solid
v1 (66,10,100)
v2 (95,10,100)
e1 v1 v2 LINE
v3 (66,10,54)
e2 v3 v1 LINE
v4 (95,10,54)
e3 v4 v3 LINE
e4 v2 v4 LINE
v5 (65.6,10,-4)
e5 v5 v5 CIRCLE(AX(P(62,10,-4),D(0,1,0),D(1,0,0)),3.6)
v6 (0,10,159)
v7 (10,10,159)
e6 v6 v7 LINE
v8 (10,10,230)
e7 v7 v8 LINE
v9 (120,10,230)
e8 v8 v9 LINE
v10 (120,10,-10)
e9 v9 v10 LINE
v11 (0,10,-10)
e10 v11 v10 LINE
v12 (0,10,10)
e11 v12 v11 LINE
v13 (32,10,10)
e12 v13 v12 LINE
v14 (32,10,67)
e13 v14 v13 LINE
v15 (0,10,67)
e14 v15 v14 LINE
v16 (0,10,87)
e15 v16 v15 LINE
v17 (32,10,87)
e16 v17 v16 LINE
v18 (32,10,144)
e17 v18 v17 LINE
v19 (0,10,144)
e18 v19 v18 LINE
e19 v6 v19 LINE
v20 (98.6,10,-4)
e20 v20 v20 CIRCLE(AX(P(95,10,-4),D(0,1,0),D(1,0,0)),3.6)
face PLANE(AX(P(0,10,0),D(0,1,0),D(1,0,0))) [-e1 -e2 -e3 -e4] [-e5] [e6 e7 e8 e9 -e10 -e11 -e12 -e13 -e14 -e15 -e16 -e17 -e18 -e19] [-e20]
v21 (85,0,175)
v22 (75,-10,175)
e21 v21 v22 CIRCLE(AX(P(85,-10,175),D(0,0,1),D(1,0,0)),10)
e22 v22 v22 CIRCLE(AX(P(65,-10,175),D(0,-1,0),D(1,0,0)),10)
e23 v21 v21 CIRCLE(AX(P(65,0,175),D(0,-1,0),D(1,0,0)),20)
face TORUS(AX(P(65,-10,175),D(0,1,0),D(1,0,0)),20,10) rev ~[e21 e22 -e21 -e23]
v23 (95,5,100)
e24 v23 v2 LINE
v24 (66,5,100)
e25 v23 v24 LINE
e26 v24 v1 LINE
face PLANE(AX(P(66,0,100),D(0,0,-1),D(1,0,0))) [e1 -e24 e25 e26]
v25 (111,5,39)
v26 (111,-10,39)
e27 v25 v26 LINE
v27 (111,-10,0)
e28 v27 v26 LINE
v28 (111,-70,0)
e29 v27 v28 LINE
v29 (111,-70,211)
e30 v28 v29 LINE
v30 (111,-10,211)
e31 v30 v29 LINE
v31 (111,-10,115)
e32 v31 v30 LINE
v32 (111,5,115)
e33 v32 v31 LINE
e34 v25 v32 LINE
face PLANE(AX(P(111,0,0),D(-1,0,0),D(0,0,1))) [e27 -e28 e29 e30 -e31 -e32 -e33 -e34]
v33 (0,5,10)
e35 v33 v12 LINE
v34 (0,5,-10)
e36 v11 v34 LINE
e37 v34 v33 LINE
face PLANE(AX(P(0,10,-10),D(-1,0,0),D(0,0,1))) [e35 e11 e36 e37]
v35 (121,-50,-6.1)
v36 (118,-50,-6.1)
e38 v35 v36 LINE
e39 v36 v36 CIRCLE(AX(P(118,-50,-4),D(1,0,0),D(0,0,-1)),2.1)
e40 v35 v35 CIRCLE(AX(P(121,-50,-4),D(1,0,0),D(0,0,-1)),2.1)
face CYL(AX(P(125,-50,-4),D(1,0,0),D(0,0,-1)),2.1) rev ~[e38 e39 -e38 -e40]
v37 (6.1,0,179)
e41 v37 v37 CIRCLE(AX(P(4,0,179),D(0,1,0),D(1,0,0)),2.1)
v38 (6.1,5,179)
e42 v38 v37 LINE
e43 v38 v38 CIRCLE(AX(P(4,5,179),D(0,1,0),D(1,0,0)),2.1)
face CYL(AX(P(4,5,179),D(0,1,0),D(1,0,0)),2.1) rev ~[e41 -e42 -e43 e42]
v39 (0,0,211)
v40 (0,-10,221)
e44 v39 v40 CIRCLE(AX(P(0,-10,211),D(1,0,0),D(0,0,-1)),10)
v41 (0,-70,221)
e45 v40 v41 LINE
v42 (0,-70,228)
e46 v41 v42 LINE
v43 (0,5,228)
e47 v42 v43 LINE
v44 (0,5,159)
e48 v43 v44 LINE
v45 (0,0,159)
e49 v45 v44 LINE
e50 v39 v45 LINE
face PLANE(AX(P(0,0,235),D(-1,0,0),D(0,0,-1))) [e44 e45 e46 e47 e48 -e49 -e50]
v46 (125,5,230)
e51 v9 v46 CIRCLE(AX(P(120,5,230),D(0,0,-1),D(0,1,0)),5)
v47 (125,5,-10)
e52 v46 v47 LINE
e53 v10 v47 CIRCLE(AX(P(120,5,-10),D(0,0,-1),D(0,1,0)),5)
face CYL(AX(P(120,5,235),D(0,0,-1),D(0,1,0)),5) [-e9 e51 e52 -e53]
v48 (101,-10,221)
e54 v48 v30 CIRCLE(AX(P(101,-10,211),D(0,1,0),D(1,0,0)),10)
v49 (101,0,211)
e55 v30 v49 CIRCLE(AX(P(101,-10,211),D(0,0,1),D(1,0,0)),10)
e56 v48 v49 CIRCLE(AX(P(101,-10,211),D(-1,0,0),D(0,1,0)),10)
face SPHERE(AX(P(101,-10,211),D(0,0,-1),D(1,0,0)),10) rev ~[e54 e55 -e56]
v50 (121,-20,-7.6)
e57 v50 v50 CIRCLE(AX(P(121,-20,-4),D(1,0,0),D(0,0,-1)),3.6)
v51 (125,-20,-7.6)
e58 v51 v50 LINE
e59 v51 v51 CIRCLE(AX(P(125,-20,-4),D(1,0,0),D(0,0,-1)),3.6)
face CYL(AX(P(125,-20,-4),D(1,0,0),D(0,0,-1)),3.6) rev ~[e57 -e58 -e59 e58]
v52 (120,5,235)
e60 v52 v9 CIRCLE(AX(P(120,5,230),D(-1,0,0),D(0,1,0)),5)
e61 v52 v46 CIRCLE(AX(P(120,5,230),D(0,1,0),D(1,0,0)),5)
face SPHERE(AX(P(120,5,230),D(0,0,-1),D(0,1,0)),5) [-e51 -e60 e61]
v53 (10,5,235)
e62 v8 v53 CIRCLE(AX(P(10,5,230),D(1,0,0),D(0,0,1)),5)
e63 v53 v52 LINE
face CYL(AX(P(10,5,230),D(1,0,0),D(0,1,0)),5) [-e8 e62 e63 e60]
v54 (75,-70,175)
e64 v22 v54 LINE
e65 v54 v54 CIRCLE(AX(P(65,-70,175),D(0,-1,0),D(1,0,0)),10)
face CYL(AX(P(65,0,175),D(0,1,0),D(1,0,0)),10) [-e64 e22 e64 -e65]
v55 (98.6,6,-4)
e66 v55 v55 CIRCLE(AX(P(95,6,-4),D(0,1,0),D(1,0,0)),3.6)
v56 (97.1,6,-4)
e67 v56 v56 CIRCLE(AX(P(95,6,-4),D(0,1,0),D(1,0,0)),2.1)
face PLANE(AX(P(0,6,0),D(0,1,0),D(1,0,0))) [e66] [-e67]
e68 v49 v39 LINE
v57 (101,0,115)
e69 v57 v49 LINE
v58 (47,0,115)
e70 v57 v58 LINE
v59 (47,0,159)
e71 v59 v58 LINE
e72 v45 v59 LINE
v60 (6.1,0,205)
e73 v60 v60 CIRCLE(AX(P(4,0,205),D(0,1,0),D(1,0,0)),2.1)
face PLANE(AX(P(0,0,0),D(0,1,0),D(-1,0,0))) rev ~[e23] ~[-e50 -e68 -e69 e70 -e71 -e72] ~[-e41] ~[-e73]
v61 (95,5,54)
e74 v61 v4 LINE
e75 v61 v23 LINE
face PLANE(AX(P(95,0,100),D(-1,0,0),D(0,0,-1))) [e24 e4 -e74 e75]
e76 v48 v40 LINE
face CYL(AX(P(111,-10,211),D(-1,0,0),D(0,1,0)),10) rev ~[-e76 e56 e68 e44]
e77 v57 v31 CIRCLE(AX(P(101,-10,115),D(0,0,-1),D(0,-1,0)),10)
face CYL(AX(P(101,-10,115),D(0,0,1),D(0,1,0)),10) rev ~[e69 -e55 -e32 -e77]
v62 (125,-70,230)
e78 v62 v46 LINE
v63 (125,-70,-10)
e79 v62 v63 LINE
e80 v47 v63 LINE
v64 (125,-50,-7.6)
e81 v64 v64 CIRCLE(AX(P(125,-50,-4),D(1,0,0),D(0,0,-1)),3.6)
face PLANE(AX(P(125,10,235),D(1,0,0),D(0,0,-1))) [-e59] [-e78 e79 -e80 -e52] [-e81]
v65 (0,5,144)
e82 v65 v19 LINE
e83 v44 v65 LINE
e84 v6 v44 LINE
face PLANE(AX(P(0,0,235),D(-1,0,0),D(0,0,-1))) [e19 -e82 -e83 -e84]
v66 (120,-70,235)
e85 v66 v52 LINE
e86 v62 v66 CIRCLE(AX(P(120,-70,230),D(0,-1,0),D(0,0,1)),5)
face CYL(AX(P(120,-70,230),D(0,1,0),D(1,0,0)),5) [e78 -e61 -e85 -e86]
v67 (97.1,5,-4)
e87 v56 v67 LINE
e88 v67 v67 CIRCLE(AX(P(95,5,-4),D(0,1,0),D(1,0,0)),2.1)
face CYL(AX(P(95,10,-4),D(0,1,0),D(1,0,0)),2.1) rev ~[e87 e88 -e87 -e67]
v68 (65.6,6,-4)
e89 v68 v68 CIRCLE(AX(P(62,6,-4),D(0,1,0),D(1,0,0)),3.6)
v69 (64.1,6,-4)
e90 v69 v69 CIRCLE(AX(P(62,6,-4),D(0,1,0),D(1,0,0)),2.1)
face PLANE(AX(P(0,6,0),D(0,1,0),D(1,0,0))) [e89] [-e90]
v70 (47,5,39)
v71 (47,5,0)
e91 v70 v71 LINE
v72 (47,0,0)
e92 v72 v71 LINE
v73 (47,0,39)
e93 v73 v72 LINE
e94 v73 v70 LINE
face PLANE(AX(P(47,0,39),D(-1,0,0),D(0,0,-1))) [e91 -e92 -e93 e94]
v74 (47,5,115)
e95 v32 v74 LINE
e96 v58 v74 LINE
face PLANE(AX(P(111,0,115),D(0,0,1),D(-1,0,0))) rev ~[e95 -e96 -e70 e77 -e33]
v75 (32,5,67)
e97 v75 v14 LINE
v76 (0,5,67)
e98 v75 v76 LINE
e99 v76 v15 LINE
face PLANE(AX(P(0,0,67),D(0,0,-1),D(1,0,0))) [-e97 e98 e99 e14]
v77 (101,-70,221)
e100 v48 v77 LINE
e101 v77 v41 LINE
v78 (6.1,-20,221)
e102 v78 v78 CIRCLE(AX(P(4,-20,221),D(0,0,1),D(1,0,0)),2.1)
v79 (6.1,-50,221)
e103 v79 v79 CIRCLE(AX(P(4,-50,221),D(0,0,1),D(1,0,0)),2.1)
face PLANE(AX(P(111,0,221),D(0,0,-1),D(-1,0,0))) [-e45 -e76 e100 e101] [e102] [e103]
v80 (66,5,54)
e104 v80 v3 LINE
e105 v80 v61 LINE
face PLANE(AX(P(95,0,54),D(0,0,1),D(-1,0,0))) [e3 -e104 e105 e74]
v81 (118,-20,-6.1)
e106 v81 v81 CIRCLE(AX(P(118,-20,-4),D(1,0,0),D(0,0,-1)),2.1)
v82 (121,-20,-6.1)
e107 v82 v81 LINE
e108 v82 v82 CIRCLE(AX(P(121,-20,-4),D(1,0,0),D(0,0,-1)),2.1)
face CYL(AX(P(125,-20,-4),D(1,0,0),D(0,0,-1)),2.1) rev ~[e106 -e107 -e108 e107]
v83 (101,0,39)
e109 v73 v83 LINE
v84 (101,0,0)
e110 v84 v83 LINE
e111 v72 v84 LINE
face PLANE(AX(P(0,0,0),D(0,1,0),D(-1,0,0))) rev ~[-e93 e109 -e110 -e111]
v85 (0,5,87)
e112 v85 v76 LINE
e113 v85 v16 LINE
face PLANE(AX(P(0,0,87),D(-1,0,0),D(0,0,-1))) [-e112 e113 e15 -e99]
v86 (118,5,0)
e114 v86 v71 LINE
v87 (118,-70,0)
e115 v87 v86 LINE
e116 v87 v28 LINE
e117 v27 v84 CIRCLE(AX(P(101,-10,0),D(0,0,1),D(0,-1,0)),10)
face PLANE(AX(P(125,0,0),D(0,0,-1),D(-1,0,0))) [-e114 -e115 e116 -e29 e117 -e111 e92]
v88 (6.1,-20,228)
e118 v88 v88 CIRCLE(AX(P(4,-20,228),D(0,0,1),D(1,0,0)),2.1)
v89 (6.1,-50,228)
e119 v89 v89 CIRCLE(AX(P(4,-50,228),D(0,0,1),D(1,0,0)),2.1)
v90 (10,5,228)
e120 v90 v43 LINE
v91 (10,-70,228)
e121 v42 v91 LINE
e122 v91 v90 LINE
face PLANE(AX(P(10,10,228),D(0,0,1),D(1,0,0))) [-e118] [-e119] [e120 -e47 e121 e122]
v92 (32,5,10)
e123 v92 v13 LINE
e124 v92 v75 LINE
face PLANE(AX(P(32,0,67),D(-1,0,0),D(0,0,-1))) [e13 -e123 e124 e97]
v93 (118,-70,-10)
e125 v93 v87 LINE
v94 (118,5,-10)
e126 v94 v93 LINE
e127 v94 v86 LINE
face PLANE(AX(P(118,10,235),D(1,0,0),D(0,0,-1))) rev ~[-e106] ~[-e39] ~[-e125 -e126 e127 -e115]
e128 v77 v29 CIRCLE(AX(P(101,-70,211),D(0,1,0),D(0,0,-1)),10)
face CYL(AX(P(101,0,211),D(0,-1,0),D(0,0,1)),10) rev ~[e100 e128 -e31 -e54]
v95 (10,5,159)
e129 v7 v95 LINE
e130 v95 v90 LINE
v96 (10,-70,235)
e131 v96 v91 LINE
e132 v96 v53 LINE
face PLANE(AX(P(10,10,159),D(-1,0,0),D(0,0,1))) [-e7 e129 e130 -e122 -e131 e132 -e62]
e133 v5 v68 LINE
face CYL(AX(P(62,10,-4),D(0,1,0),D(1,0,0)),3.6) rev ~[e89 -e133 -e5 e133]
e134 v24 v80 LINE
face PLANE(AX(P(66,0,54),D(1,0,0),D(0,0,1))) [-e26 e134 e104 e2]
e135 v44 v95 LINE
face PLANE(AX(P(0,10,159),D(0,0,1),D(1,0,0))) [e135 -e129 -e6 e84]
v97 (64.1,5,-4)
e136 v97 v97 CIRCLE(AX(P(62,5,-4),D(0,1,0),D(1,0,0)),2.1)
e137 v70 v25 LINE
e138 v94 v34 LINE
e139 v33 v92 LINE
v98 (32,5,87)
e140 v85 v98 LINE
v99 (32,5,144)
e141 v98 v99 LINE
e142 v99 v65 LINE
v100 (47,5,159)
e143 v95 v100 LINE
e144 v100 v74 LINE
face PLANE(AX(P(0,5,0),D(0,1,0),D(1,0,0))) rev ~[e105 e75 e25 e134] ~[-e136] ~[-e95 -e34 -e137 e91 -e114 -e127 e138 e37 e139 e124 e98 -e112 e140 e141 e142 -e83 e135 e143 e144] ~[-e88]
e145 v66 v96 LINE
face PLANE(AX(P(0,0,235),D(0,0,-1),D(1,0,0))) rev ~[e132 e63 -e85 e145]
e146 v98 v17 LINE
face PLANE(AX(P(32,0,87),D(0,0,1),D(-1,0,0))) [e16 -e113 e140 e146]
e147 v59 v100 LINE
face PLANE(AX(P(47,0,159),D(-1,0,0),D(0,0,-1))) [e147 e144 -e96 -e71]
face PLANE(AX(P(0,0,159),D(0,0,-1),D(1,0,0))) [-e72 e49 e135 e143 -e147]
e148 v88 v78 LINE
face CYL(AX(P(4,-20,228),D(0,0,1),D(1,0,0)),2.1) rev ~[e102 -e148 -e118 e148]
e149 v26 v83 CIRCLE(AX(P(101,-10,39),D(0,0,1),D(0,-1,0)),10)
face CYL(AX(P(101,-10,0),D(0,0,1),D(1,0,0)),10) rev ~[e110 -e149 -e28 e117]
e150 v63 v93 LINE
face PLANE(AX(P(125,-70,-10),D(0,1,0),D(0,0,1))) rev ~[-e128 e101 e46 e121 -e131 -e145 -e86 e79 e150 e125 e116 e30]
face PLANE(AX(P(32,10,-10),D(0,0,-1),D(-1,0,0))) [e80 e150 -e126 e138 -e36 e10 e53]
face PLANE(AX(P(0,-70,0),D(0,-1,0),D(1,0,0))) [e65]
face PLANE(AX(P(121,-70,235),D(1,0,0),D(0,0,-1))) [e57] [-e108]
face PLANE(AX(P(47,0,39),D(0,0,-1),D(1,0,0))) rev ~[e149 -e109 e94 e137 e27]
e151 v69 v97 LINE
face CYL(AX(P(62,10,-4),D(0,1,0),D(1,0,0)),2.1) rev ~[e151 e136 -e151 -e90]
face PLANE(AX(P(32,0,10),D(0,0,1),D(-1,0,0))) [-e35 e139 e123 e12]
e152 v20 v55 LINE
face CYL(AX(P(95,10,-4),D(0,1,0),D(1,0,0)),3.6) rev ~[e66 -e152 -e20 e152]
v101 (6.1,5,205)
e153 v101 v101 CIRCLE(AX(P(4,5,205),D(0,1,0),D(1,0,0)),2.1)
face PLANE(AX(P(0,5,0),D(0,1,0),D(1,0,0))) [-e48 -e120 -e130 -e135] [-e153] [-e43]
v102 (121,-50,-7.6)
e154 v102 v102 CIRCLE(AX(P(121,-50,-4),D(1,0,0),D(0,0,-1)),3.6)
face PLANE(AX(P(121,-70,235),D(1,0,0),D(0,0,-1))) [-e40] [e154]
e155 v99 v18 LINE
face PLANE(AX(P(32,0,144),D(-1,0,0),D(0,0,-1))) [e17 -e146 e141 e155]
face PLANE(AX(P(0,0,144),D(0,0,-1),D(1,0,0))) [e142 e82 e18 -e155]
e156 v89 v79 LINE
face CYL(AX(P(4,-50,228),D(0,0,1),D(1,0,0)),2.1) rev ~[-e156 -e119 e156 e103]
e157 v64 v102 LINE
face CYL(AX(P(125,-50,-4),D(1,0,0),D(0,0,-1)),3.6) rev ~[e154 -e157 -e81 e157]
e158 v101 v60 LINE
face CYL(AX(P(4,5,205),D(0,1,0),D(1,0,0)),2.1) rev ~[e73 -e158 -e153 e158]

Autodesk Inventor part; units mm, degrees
ref_plane "YZ Plane" through (0, 0, 0) normal (1, 0, 0) x (0, 1, 0)
ref_plane "XZ Plane" through (0, 0, 0) normal (0, 1, 0) x (-1, 0, 0)
ref_plane "XY Plane" through (0, 0, 0) normal (0, 0, 1) x (1, 0, 0)
sketch "草图5" plane through (0, 0, 0) normal (0, 1, 0) x (-1, 0, 0)
  line L0 (125, 235) -> (-125, 235)
  line L1 (-125, 235) -> (-125, -235)
  line L2 (-125, -235) -> (125, -235)
  line L3 (125, -235) -> (125, 235)
  line L4 (0, 3) -> (0, -5)
  line L5 (3.5058, 0) -> (-3.4421, 0)
  line L6 (25, 144) -> (-32, 144)
  line L7 (-32, 144) -> (-32, 87)
  line L8 (-32, 87) -> (25, 87)
  line L9 (25, 87) -> (25, 144)
  line L10 (25, 67) -> (-32, 67)
  line L11 (-32, 67) -> (-32, 10)
  line L12 (-32, 10) -> (25, 10)
  line L13 (25, 10) -> (25, 67)
  line L14 (25, -10) -> (-32, -10)
  line L15 (-32, -10) -> (-32, -67)
  line L16 (-32, -67) -> (25, -67)
  line L17 (25, -67) -> (25, -10)
  line L18 (25, -87) -> (-32, -87)
  line L19 (-32, -87) -> (-32, -144)
  line L20 (-32, -144) -> (25, -144)
  line L21 (25, -144) -> (25, -87)
  line L22 (-66, 100) -> (-95, 100)
  line L23 (-95, 100) -> (-95, 54)
  line L24 (-95, 54) -> (-66, 54)
  line L25 (-66, 54) -> (-66, 100)
  line L26 (-66, -54) -> (-95, -54)
  line L27 (-95, -54) -> (-95, -100)
  line L28 (-95, -100) -> (-66, -100)
  line L29 (-66, -100) -> (-66, -54)
  line L30 (100, 15) -> (70, 15)
  line L31 (70, 15) -> (70, -15)
  line L32 (70, -15) -> (100, -15)
  line L33 (100, -15) -> (100, 15)
  circle A0 centre (65, 182) radius 10
  circle A1 centre (65, -182) radius 10
  circle A2 centre (65, 182) radius 15
  circle A3 centre (80, 182) radius 1.5
  circle A4 centre (57.5, 194.9904) radius 1.5
  circle A5 centre (57.5, 169.0096) radius 1.5
  line L34 (125, 235) -> (0, 235)
  line L35 (0, 235) -> (0, 0)
  line L36 (0, 0) -> (125, 0)
  line L37 (125, 0) -> (125, 235)
  line L38 (-125, 235) -> (0, 235)
  line L39 (0, 235) -> (0, 0)
  line L40 (0, 0) -> (-125, 0)
  line L41 (-125, 0) -> (-125, 235)
  line L42 (-125, -235) -> (0, -235)
  line L43 (0, -235) -> (0, 0)
  line L44 (0, 0) -> (-125, 0)
  line L45 (-125, 0) -> (-125, -235)
  line L46 (125, -235) -> (0, -235)
  line L47 (0, -235) -> (0, 0)
  line L48 (0, 0) -> (125, 0)
  line L49 (125, 0) -> (125, -235)
  circle A6 centre (65, -182) radius 15
  circle A7 centre (80, -182) radius 1.5
  circle A8 centre (57.5, -169.0096) radius 1.5
  circle A9 centre (57.5, -194.9904) radius 1.5
  point P0 (0, 67)
  point P1 (0, 87)
  point P2 (0, 144)
  point P3 (0, 10)
  dimension "d142" = 30
  dimension "d145" = 30
  dimension "d111" = 470
  dimension "d112" = 250
  dimension "d113" = 57
  dimension "d114" = 57
  dimension "d115" = 57
  dimension "d116" = 57
  dimension "d117" = 57
  dimension "d118" = 57
  dimension "d119" = 57
  dimension "d120" = 57
  dimension "d121" = 91
  dimension "d122" = 20
  dimension "d123" = 20
  dimension "d124" = 20
  dimension "d125" = 93
  dimension "d126" = 29
  dimension "d127" = 46
  dimension "d128" = 46
  dimension "d129" = 135
  dimension "d130" = 108
  dimension "d131" = 30
  dimension "d132" = 30
  dimension "d133" = 30
  dimension "d134" = 25
  dimension "d135" = 220
  dimension "d136" = 20
  dimension "d137" = 53
  dimension "d138" = 60
  dimension "d139" = 20
  dimension "d140" = 53
  dimension "d141" = 60
  dimension "d143" = 3
  dimension "d144" = 360
  dimension "d146" = 3
  dimension "d147" = 360
extrude "拉伸5" add sketch "草图5" along normal blind 10 contours L35 L6 L7 L8 L10 L11 L12 L4 L5 L40 L1 L0
sketch "草图6" plane through (0, 0, 0) normal (0, -1, 0) x (1, 0, 0)
  line L0 (125, 0) -> (0, 0) projected
  line L1 (0, 144) -> (0, 235) projected
  line L2 (47, 0) -> (0, 0)
  line L3 (0, 0) -> (0, 159)
  line L4 (0, 159) -> (47, 159)
  line L5 (47, 159) -> (47, 0)
  line L6 (32, 87) -> (32, 144) projected
  line L7 (32, 144) -> (0, 144) projected
  line L8 (111, 115) -> (47, 115)
  line L9 (47, 115) -> (47, 39)
  line L10 (47, 39) -> (111, 39)
  line L11 (111, 39) -> (111, 115)
  line L12 (95, 54) -> (95, 100) projected
  line L13 (95, 100) -> (66, 100) projected
  line L14 (66, 54) -> (95, 54) projected
  line L15 (66, 100) -> (66, 54) projected
  dimension "d150" = 15
  dimension "d151" = 15
  dimension "d152" = 16
  dimension "d153" = 15
  dimension "d154" = 15
  dimension "d155" = 19
extrude "拉伸6" cut sketch "草图6" against normal blind 5 contours L0 L3 L1 L4 L5 | L5 L8 L11 L10 | L14 L15 L13 L12
sketch "草图7" plane through (0, 10, 0) normal (0, 1, 0) x (1, 0, 0)
  line L0 (0, -144) -> (0, -159) projected
  line L1 (0, -235) -> (125, -235) projected
  line L2 (0, -159) -> (10, -159)
  line L3 (10, -159) -> (10, -235)
  line L4 (10, -235) -> (0, -235)
  line L5 (0, -235) -> (0, -159)
  point P0 (0, 0)
  dimension "d158" = 10
extrude "拉伸7" cut sketch "草图7" against normal blind 5
sketch "草图8" plane through (0, 5, 0) normal (0, 1, 0) x (1, 0, 0)
  circle A0 centre (4, -205) radius 2.1
  circle A1 centre (4, -179) radius 2.1
  line L0 (0, -235) -> (0, -159) projected
  line L1 (10, -235) -> (0, -235) projected
  line L2 (32, -144) -> (0, -144) projected
  line L3 (0, -159) -> (10, -159) projected
  point P0 (0, 0)
  dimension "d161" = 4.2
  dimension "d162" = 4.2
  dimension "d163" = 4
  dimension "d164" = 4
  dimension "d165" = 30
  dimension "d169" = 20
extrude "拉伸8" cut sketch "草图8" against normal blind 5
sketch "草图9" plane through (0, 0, 0) normal (0, -1, 0) x (1, 0, 0)
  line L0 (125, 0) -> (0, 0) projected
  line L1 (0, 235) -> (125, 235) projected
  line L2 (125, 0) -> (111, 0)
  line L3 (111, 0) -> (111, 235)
  line L4 (111, 235) -> (125, 235)
  line L5 (125, 235) -> (125, 0)
  line L6 (0, 159) -> (0, 235) projected
  line L7 (125, 235) -> (125, 0) projected
  line L8 (0, 235) -> (125, 235)
  line L9 (125, 235) -> (125, 221)
  line L10 (125, 221) -> (0, 221)
  line L11 (0, 221) -> (0, 235)
  point P0 (0, 221)
  point P1 (111, 221)
  dimension "d170" = 14
  dimension "d171" = 14
extrude "拉伸9" add sketch "草图9" along normal blind 70
sketch "草图10" plane through (10, 10, 235) normal (0, 0, 1) x (1, 0, 0)
  line L0 (0, -5) -> (-10, -5) projected
  line L1 (-10, -80) -> (-10, -5) projected
  line L2 (0, -5) -> (-10, -5)
  line L3 (-10, -5) -> (-10, -80)
  line L4 (-10, -80) -> (0, -80)
  line L5 (0, -80) -> (0, -5)
  point P0 (-10, -10)
extrude "拉伸10" cut sketch "草图10" against normal blind 7
sketch "草图11" plane through (10, 10, 228) normal (0, 0, 1) x (1, 0, 0)
  circle A0 centre (-6, -30) radius 2.1
  circle A1 centre (-6, -60) radius 2.1
  line L0 (-10, -80) -> (-10, -5) projected
  line L1 (0, -80) -> (-10, -80) projected
  line L2 (0, 0) -> (115, 0) projected
  point P0 (-10, -10)
  dimension "d176" = 4.2
  dimension "d177" = 4.2
  dimension "d178" = 4
  dimension "d179" = 4
  dimension "d180" = 20
  dimension "d181" = 30
extrude "拉伸11" cut sketch "草图11" against normal blind 7
fillet "圆角2" radius 10 4 edges at (111, 0, 168) (111, 0, 19.5) (111, -35, 221) (55.5, 0, 221)
sketch "草图12" plane through (0, 0, 0) normal (0, -1, 0) x (1, 0, 0)
  circle A0 centre (65, 175) radius 10
  line L0 (125, 0) -> (125, 235) projected
  line L1 (125, 235) -> (10, 235) projected
  point P0 (0, 0)
  point P1 (125, 230)
  point P2 (120, 235)
  dimension "d186" = 20
  dimension "d187" = 60
  dimension "d188" = 60
extrude "拉伸12" add sketch "草图12" along normal blind 70
fillet "圆角3" radius 10 1 edges at (55, 0, 175)
sketch "草图14" plane through (125, 10, 235) normal (1, 0, 0) x (0, 0, -1)
  line L0 (235, -80) -> (235, 0) projected
  line L1 (235, 0) -> (245, 0)
  line L2 (245, 0) -> (245, -80)
  line L3 (245, -80) -> (235, -80)
  line L4 (235, -80) -> (235, 0)
  line L5 (0, 0) -> (235, 0) projected
  circle A0 centre (239, -60) radius 2.1
  circle A1 centre (239, -30) radius 2.1
  point P0 (235, -10)
  dimension "d192" = 10
  dimension "d193" = 80
  dimension "d196" = 4.2
  dimension "d197" = 4.2
  dimension "d198" = 6
  dimension "d199" = 6
  dimension "d200" = 20
  dimension "d201" = 30
extrude "拉伸14" add sketch "草图14" against normal blind 7
sketch "草图15" plane through (0, 10, 0) normal (0, 1, 0) x (1, 0, 0)
  line L0 (118, 0) -> (0, 0)
  circle A0 centre (95, 4) radius 2.1
  circle A1 centre (62, 4) radius 2.1
  line L1 (125, -235) -> (125, 10) projected
  line L2 (118, 0) -> (32, 0)
  line L3 (32, 0) -> (32, 10)
  line L4 (32, 10) -> (118, 10)
  line L5 (118, 10) -> (118, 0)
  line L6 (32, -10) -> (32, -67) projected
  line L7 (125, 10) -> (118, 10) projected
  point P0 (32, 0)
  dimension "d205" = 4.2
  dimension "d206" = 4.2
  dimension "d209" = 30
  dimension "d212" = 6
  dimension "d213" = 6
  dimension "d214" = 30
extrude "拉伸15" add sketch "草图15" against normal blind 5
sketch "草图16" plane through (0, 10, 0) normal (0, 1, 0) x (1, 0, 0)
  circle A0 centre (95, 4) radius 2.1 projected
  circle A1 centre (95, 4) radius 3.6
  circle A2 centre (62, 4) radius 2.1 projected
  circle A3 centre (62, 4) radius 3.6
  point P0 (0, 0)
  dimension "d217" = 7.2
  dimension "d218" = 7.2
extrude "拉伸16" cut sketch "草图16" against normal blind 4
sketch "草图17" plane through (125, -70, 235) normal (1, 0, 0) x (0, 0, -1)
  circle A0 centre (239, 50) radius 2.1 projected
  circle A1 centre (239, 50) radius 3.6
  circle A2 centre (239, 20) radius 2.1 projected
  circle A3 centre (239, 20) radius 3.6
  point P0 (235, 70)
  dimension "d221" = 7.2
  dimension "d222" = 7.2
extrude "拉伸17" cut sketch "草图17" against normal blind 4
fillet "圆角4" radius 5 3 edges at (125, 10, 112.5) (67.5, 10, 235) (125, -30, 235)
sketch "草图18" plane through (0, 10, 0) normal (0, 1, 0) x (1, 0, 0)
  line L0 (0, 0) -> (0, -10) projected
  line L1 (32, 10) -> (118, 10) projected
  line L2 (0, 0) -> (32, 0)
  line L3 (32, 0) -> (32, 10)
  line L4 (32, 10) -> (0, 10)
  line L5 (0, 10) -> (0, 0)
extrude "拉伸18" add sketch "草图18" against normal blind 5
sketch "草图20" plane through (0, -70, 0) normal (0, -1, 0) x (1, 0, 0)
  circle A0 centre (65, 175) radius 10 projected
  circle A1 centre (65, 175) radius 10
  line L0 (111, 211) -> (111, 0) projected
  line L1 (0, 221) -> (101, 221) projected
  point P0 (0, 0)
  dimension "d228" = 46
  dimension "d229" = 46
properties part number "top_3"
